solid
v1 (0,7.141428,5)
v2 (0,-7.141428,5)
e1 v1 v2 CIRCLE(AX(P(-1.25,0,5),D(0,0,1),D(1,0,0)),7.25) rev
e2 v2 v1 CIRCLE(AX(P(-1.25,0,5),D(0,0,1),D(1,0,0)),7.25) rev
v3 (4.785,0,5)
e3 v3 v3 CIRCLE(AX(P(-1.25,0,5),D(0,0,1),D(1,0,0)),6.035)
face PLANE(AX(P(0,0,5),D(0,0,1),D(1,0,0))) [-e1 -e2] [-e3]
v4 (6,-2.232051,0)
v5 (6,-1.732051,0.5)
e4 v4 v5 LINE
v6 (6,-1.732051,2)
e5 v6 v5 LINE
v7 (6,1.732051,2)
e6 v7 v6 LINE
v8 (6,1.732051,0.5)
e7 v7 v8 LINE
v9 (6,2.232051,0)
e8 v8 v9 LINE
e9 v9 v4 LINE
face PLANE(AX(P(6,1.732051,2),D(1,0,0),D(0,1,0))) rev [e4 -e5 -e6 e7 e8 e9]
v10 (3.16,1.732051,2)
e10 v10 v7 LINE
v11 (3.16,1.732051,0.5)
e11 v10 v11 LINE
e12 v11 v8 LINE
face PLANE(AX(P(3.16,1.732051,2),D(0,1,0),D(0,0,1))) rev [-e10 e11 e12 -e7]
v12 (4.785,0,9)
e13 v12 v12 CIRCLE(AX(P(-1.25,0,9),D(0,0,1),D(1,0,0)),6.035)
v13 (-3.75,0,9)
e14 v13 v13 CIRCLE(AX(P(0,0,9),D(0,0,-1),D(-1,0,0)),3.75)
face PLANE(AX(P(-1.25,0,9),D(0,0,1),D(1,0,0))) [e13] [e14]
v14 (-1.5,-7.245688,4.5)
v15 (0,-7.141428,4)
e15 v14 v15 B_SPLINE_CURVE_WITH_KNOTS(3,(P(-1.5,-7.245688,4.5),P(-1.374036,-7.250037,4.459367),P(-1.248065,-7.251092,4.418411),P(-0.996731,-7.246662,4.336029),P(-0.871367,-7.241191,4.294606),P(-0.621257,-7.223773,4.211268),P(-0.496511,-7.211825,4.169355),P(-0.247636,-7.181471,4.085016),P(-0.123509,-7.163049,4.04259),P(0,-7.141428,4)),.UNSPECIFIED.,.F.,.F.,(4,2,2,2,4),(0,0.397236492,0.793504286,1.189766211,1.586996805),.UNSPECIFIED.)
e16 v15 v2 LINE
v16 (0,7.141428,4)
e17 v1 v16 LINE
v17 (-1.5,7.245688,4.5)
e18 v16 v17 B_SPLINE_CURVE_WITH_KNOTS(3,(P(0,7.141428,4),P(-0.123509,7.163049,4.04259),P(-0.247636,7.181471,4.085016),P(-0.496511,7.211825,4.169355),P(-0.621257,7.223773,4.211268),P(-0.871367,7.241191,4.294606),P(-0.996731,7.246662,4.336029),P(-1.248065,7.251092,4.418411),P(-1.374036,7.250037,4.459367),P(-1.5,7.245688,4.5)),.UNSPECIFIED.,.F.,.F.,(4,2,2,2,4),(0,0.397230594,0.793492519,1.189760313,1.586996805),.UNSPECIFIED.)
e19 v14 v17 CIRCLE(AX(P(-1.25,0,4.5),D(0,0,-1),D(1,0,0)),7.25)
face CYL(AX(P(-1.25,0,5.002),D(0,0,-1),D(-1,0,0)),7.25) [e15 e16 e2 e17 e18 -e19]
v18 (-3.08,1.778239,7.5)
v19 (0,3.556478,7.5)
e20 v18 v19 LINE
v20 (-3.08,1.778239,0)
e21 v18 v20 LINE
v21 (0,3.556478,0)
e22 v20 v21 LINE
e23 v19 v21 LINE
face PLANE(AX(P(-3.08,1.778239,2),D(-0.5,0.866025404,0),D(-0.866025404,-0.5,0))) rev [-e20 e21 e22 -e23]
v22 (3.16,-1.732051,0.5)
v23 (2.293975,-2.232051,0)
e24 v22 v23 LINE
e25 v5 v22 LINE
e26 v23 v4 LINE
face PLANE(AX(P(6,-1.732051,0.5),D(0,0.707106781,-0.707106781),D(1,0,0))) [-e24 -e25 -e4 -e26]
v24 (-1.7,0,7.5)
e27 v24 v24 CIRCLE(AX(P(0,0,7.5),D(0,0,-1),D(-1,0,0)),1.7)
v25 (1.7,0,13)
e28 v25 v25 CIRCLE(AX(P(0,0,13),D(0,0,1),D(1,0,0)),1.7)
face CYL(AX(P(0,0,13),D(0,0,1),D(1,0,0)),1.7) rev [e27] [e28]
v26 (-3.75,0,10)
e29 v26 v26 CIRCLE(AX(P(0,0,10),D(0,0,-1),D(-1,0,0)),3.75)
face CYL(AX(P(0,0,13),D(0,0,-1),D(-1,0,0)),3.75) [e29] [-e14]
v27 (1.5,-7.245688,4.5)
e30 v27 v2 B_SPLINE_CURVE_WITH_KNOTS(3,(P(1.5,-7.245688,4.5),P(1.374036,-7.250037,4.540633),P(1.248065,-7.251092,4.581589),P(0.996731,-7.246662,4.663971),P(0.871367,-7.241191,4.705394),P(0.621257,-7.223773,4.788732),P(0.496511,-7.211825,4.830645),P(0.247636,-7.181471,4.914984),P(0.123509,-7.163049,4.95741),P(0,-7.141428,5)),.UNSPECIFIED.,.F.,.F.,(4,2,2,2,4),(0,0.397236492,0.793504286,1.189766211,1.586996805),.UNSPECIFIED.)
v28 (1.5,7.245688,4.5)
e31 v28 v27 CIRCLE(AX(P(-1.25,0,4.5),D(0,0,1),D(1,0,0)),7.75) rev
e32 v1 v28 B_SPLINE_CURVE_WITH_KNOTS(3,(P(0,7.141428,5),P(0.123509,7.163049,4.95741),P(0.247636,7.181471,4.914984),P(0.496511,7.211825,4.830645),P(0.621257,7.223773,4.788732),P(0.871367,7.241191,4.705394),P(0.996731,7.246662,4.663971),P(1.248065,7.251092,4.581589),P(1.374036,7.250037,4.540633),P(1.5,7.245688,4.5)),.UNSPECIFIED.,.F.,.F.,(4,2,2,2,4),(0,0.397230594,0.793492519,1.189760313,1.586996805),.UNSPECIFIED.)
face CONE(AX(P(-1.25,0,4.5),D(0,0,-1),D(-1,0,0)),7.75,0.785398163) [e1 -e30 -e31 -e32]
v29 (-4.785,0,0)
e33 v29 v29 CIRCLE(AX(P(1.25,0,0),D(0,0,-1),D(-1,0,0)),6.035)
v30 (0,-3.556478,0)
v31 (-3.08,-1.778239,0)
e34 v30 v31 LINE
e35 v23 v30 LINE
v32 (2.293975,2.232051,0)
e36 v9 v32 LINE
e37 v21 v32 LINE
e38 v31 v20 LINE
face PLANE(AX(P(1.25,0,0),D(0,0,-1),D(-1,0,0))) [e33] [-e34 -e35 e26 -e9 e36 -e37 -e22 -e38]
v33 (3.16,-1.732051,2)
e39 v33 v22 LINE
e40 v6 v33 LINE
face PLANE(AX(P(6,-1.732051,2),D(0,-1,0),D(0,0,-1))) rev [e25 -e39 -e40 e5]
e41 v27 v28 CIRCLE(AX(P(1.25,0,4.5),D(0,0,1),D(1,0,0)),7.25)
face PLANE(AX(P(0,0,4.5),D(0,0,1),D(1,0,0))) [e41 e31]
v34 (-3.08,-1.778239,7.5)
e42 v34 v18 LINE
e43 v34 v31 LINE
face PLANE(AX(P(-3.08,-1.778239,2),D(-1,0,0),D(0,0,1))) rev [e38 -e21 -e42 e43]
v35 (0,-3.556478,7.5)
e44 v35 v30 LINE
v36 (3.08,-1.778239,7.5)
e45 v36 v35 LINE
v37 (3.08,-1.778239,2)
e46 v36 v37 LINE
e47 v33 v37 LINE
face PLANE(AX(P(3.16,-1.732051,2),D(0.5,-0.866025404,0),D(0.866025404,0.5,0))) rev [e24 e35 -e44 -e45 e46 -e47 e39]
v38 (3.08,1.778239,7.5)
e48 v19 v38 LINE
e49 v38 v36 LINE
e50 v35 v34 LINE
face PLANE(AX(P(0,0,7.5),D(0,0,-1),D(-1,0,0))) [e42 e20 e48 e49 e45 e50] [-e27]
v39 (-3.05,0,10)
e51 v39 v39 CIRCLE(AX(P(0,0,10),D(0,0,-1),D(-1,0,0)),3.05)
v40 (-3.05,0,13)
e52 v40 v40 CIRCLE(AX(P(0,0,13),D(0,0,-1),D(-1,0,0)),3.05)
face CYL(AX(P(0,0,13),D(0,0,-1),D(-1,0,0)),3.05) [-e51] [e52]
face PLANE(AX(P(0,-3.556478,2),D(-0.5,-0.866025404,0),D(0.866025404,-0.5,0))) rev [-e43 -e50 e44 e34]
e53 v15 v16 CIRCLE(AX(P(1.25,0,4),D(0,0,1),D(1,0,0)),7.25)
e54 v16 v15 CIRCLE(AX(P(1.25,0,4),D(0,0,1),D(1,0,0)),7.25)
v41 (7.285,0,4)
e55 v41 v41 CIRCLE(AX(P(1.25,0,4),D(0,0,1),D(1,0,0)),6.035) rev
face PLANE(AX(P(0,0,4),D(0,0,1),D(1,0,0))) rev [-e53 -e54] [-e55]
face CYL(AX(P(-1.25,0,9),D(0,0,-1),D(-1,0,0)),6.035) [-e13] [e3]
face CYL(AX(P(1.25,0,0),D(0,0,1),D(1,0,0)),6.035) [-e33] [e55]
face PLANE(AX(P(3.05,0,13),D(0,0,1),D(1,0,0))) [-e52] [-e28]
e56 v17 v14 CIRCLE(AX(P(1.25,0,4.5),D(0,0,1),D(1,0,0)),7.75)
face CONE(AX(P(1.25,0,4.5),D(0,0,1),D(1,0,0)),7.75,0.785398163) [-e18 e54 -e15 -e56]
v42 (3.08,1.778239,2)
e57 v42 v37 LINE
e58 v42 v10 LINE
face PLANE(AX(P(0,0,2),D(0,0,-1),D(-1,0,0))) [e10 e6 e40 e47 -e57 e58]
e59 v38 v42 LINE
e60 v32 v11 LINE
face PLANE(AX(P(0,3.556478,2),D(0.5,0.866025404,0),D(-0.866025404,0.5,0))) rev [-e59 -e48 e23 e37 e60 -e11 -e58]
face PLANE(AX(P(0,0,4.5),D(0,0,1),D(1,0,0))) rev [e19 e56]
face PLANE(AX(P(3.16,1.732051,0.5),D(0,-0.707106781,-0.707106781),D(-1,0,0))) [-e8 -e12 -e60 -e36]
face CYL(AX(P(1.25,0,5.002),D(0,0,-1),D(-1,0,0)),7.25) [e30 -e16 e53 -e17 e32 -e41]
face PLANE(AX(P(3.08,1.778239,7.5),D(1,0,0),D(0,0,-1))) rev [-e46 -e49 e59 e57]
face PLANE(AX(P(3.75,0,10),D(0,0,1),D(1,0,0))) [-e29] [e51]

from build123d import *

# Parameters (mm, degrees)
EXTRUDE_START               = -0.5
EXTRUDE_1_OUTLINE_R         = 6.035
EXTRUDE_1_DEPTH             = 4.5
EXTRUDE_START_2             = 4
EXTRUDE_1_2_DEPTH           = 1
SKETCH_2_R                  = 6.035
EXTRUDE_2_DEPTH             = 4
CUT_EXTRUDE_1_DEPTH         = 2
CUT_EXTRUDE_2_DEPTH         = 5.5
HOLE_WIZARD_3_4_3_4_1_D     = 3.4
HOLE_WIZARD_3_4_3_4_1_DEPTH = 13
CHAMFER_1_SIZE              = 0.5


with BuildPart() as part:
    # 凸台-拉伸1: read off the stored shape, not the designer's step
    # 凸台-拉伸1 outline → 凸台-拉伸1 (new body)
    with BuildSketch(Plane.XY.offset(5).offset(EXTRUDE_START)):
        with Locations((-1.25, 0)):
            Circle(EXTRUDE_1_OUTLINE_R)
    extrude(amount=EXTRUDE_1_DEPTH)

    # Extrude 1 2 outline → Extrude 1 2 (add)
    with BuildSketch(Plane.XY.offset(EXTRUDE_START_2)):
        with BuildLine():
            ThreePointArc((0, -7.141428429), (8.5, 0), (0, 7.141428429))
            ThreePointArc((0, 7.141428429), (-8.5, 0), (0, -7.141428429))
        make_face()
    extrude(amount=EXTRUDE_1_2_DEPTH)

    # Extrude 1 3 outline → Extrude 1 3 (revolve, cut)
    with BuildSketch(Plane(origin=(-1.25, 0, 0), x_dir=(1, 0, 0), z_dir=(0, -1, 0))):
        Polygon((7.25, 5), (7.75, 4.5), (9.75, 4.5), (9.75, 5), align=None)
    revolve(axis=Axis((-1.25, 0, 0), (0, 0, 1)), mode=Mode.SUBTRACT)

    # Extrude 1 4 outline → Extrude 1 4 (revolve, cut)
    with BuildSketch(Plane(origin=(1.25, 0, 0), x_dir=(1, 0, 0), z_dir=(0, -1, 0))):
        Polygon((9.75, 4.5), (7.75, 4.5), (7.25, 4), (9.75, 4), align=None)
    revolve(axis=Axis((1.25, 0, 0), (0, 0, 1)), mode=Mode.SUBTRACT)

    # 草图2 → 凸台-拉伸2 (add)
    with BuildSketch(Plane(origin=(0, 0, 4), x_dir=(-1, 0, 0), z_dir=(0, 0, -1))):
        with Locations(Location((-1.25, 0, 0), (0, 0, 180))):
            Circle(SKETCH_2_R)
    extrude(amount=EXTRUDE_2_DEPTH)

    # 草图3 → 切除-拉伸1 (cut)
    with BuildSketch(Plane(origin=(0, 0, 0), x_dir=(-1, 0, 0), z_dir=(0, 0, -1))):
        Polygon((-6, -1.732050808), (-3.16, -1.732050808), (0, -3.556477658), (3.08, -1.778238829), (3.08, 1.778238829), (0, 3.556477658), (-3.16, 1.732050808), (-6, 1.732050808), align=None)
    extrude(amount=-CUT_EXTRUDE_1_DEPTH, mode=Mode.SUBTRACT)

    # 草图4 → 切除-拉伸2 (cut)
    with BuildSketch(Plane(origin=(0, 0, 2), x_dir=(-1, 0, 0), z_dir=(0, 0, -1))):
        Polygon((-3.08, -1.778238829), (0, -3.556477658), (3.08, -1.778238829), (3.08, 1.778238829), (0, 3.556477658), (-3.08, 1.778238829), align=None)
    extrude(amount=-CUT_EXTRUDE_2_DEPTH, mode=Mode.SUBTRACT)

    # 草图5 → 旋转1 (revolve)
    with BuildSketch(Plane.XZ, mode=Mode.PRIVATE) as revolve_1_sk:
        Polygon((3.05, 13), (0, 13), (0, 9), (3.75, 9), (3.75, 10), (3.05, 10), align=None)
    revolve(revolve_1_sk.sketch.rotate(Axis((0, 0, 13), (0, 0, -1)), 180), axis=Axis((0, 0, 13), (0, 0, -1)))

    # Ø3.4 (3.4) 直径孔1
    with Locations(Plane.XY.offset(13)):
        with Locations((0, 0)):
            Hole(HOLE_WIZARD_3_4_3_4_1_D / 2, depth=HOLE_WIZARD_3_4_3_4_1_DEPTH)

    # 倒角1
    chamfer_1_edges = [part.edges().sort_by_distance(p)[0] for p in [
        (4.58, -1.732050808, 0),
        (4.58, 1.732050808, 0),
    ]]
    chamfer(chamfer_1_edges, length=CHAMFER_1_SIZE)


solid = part.part
